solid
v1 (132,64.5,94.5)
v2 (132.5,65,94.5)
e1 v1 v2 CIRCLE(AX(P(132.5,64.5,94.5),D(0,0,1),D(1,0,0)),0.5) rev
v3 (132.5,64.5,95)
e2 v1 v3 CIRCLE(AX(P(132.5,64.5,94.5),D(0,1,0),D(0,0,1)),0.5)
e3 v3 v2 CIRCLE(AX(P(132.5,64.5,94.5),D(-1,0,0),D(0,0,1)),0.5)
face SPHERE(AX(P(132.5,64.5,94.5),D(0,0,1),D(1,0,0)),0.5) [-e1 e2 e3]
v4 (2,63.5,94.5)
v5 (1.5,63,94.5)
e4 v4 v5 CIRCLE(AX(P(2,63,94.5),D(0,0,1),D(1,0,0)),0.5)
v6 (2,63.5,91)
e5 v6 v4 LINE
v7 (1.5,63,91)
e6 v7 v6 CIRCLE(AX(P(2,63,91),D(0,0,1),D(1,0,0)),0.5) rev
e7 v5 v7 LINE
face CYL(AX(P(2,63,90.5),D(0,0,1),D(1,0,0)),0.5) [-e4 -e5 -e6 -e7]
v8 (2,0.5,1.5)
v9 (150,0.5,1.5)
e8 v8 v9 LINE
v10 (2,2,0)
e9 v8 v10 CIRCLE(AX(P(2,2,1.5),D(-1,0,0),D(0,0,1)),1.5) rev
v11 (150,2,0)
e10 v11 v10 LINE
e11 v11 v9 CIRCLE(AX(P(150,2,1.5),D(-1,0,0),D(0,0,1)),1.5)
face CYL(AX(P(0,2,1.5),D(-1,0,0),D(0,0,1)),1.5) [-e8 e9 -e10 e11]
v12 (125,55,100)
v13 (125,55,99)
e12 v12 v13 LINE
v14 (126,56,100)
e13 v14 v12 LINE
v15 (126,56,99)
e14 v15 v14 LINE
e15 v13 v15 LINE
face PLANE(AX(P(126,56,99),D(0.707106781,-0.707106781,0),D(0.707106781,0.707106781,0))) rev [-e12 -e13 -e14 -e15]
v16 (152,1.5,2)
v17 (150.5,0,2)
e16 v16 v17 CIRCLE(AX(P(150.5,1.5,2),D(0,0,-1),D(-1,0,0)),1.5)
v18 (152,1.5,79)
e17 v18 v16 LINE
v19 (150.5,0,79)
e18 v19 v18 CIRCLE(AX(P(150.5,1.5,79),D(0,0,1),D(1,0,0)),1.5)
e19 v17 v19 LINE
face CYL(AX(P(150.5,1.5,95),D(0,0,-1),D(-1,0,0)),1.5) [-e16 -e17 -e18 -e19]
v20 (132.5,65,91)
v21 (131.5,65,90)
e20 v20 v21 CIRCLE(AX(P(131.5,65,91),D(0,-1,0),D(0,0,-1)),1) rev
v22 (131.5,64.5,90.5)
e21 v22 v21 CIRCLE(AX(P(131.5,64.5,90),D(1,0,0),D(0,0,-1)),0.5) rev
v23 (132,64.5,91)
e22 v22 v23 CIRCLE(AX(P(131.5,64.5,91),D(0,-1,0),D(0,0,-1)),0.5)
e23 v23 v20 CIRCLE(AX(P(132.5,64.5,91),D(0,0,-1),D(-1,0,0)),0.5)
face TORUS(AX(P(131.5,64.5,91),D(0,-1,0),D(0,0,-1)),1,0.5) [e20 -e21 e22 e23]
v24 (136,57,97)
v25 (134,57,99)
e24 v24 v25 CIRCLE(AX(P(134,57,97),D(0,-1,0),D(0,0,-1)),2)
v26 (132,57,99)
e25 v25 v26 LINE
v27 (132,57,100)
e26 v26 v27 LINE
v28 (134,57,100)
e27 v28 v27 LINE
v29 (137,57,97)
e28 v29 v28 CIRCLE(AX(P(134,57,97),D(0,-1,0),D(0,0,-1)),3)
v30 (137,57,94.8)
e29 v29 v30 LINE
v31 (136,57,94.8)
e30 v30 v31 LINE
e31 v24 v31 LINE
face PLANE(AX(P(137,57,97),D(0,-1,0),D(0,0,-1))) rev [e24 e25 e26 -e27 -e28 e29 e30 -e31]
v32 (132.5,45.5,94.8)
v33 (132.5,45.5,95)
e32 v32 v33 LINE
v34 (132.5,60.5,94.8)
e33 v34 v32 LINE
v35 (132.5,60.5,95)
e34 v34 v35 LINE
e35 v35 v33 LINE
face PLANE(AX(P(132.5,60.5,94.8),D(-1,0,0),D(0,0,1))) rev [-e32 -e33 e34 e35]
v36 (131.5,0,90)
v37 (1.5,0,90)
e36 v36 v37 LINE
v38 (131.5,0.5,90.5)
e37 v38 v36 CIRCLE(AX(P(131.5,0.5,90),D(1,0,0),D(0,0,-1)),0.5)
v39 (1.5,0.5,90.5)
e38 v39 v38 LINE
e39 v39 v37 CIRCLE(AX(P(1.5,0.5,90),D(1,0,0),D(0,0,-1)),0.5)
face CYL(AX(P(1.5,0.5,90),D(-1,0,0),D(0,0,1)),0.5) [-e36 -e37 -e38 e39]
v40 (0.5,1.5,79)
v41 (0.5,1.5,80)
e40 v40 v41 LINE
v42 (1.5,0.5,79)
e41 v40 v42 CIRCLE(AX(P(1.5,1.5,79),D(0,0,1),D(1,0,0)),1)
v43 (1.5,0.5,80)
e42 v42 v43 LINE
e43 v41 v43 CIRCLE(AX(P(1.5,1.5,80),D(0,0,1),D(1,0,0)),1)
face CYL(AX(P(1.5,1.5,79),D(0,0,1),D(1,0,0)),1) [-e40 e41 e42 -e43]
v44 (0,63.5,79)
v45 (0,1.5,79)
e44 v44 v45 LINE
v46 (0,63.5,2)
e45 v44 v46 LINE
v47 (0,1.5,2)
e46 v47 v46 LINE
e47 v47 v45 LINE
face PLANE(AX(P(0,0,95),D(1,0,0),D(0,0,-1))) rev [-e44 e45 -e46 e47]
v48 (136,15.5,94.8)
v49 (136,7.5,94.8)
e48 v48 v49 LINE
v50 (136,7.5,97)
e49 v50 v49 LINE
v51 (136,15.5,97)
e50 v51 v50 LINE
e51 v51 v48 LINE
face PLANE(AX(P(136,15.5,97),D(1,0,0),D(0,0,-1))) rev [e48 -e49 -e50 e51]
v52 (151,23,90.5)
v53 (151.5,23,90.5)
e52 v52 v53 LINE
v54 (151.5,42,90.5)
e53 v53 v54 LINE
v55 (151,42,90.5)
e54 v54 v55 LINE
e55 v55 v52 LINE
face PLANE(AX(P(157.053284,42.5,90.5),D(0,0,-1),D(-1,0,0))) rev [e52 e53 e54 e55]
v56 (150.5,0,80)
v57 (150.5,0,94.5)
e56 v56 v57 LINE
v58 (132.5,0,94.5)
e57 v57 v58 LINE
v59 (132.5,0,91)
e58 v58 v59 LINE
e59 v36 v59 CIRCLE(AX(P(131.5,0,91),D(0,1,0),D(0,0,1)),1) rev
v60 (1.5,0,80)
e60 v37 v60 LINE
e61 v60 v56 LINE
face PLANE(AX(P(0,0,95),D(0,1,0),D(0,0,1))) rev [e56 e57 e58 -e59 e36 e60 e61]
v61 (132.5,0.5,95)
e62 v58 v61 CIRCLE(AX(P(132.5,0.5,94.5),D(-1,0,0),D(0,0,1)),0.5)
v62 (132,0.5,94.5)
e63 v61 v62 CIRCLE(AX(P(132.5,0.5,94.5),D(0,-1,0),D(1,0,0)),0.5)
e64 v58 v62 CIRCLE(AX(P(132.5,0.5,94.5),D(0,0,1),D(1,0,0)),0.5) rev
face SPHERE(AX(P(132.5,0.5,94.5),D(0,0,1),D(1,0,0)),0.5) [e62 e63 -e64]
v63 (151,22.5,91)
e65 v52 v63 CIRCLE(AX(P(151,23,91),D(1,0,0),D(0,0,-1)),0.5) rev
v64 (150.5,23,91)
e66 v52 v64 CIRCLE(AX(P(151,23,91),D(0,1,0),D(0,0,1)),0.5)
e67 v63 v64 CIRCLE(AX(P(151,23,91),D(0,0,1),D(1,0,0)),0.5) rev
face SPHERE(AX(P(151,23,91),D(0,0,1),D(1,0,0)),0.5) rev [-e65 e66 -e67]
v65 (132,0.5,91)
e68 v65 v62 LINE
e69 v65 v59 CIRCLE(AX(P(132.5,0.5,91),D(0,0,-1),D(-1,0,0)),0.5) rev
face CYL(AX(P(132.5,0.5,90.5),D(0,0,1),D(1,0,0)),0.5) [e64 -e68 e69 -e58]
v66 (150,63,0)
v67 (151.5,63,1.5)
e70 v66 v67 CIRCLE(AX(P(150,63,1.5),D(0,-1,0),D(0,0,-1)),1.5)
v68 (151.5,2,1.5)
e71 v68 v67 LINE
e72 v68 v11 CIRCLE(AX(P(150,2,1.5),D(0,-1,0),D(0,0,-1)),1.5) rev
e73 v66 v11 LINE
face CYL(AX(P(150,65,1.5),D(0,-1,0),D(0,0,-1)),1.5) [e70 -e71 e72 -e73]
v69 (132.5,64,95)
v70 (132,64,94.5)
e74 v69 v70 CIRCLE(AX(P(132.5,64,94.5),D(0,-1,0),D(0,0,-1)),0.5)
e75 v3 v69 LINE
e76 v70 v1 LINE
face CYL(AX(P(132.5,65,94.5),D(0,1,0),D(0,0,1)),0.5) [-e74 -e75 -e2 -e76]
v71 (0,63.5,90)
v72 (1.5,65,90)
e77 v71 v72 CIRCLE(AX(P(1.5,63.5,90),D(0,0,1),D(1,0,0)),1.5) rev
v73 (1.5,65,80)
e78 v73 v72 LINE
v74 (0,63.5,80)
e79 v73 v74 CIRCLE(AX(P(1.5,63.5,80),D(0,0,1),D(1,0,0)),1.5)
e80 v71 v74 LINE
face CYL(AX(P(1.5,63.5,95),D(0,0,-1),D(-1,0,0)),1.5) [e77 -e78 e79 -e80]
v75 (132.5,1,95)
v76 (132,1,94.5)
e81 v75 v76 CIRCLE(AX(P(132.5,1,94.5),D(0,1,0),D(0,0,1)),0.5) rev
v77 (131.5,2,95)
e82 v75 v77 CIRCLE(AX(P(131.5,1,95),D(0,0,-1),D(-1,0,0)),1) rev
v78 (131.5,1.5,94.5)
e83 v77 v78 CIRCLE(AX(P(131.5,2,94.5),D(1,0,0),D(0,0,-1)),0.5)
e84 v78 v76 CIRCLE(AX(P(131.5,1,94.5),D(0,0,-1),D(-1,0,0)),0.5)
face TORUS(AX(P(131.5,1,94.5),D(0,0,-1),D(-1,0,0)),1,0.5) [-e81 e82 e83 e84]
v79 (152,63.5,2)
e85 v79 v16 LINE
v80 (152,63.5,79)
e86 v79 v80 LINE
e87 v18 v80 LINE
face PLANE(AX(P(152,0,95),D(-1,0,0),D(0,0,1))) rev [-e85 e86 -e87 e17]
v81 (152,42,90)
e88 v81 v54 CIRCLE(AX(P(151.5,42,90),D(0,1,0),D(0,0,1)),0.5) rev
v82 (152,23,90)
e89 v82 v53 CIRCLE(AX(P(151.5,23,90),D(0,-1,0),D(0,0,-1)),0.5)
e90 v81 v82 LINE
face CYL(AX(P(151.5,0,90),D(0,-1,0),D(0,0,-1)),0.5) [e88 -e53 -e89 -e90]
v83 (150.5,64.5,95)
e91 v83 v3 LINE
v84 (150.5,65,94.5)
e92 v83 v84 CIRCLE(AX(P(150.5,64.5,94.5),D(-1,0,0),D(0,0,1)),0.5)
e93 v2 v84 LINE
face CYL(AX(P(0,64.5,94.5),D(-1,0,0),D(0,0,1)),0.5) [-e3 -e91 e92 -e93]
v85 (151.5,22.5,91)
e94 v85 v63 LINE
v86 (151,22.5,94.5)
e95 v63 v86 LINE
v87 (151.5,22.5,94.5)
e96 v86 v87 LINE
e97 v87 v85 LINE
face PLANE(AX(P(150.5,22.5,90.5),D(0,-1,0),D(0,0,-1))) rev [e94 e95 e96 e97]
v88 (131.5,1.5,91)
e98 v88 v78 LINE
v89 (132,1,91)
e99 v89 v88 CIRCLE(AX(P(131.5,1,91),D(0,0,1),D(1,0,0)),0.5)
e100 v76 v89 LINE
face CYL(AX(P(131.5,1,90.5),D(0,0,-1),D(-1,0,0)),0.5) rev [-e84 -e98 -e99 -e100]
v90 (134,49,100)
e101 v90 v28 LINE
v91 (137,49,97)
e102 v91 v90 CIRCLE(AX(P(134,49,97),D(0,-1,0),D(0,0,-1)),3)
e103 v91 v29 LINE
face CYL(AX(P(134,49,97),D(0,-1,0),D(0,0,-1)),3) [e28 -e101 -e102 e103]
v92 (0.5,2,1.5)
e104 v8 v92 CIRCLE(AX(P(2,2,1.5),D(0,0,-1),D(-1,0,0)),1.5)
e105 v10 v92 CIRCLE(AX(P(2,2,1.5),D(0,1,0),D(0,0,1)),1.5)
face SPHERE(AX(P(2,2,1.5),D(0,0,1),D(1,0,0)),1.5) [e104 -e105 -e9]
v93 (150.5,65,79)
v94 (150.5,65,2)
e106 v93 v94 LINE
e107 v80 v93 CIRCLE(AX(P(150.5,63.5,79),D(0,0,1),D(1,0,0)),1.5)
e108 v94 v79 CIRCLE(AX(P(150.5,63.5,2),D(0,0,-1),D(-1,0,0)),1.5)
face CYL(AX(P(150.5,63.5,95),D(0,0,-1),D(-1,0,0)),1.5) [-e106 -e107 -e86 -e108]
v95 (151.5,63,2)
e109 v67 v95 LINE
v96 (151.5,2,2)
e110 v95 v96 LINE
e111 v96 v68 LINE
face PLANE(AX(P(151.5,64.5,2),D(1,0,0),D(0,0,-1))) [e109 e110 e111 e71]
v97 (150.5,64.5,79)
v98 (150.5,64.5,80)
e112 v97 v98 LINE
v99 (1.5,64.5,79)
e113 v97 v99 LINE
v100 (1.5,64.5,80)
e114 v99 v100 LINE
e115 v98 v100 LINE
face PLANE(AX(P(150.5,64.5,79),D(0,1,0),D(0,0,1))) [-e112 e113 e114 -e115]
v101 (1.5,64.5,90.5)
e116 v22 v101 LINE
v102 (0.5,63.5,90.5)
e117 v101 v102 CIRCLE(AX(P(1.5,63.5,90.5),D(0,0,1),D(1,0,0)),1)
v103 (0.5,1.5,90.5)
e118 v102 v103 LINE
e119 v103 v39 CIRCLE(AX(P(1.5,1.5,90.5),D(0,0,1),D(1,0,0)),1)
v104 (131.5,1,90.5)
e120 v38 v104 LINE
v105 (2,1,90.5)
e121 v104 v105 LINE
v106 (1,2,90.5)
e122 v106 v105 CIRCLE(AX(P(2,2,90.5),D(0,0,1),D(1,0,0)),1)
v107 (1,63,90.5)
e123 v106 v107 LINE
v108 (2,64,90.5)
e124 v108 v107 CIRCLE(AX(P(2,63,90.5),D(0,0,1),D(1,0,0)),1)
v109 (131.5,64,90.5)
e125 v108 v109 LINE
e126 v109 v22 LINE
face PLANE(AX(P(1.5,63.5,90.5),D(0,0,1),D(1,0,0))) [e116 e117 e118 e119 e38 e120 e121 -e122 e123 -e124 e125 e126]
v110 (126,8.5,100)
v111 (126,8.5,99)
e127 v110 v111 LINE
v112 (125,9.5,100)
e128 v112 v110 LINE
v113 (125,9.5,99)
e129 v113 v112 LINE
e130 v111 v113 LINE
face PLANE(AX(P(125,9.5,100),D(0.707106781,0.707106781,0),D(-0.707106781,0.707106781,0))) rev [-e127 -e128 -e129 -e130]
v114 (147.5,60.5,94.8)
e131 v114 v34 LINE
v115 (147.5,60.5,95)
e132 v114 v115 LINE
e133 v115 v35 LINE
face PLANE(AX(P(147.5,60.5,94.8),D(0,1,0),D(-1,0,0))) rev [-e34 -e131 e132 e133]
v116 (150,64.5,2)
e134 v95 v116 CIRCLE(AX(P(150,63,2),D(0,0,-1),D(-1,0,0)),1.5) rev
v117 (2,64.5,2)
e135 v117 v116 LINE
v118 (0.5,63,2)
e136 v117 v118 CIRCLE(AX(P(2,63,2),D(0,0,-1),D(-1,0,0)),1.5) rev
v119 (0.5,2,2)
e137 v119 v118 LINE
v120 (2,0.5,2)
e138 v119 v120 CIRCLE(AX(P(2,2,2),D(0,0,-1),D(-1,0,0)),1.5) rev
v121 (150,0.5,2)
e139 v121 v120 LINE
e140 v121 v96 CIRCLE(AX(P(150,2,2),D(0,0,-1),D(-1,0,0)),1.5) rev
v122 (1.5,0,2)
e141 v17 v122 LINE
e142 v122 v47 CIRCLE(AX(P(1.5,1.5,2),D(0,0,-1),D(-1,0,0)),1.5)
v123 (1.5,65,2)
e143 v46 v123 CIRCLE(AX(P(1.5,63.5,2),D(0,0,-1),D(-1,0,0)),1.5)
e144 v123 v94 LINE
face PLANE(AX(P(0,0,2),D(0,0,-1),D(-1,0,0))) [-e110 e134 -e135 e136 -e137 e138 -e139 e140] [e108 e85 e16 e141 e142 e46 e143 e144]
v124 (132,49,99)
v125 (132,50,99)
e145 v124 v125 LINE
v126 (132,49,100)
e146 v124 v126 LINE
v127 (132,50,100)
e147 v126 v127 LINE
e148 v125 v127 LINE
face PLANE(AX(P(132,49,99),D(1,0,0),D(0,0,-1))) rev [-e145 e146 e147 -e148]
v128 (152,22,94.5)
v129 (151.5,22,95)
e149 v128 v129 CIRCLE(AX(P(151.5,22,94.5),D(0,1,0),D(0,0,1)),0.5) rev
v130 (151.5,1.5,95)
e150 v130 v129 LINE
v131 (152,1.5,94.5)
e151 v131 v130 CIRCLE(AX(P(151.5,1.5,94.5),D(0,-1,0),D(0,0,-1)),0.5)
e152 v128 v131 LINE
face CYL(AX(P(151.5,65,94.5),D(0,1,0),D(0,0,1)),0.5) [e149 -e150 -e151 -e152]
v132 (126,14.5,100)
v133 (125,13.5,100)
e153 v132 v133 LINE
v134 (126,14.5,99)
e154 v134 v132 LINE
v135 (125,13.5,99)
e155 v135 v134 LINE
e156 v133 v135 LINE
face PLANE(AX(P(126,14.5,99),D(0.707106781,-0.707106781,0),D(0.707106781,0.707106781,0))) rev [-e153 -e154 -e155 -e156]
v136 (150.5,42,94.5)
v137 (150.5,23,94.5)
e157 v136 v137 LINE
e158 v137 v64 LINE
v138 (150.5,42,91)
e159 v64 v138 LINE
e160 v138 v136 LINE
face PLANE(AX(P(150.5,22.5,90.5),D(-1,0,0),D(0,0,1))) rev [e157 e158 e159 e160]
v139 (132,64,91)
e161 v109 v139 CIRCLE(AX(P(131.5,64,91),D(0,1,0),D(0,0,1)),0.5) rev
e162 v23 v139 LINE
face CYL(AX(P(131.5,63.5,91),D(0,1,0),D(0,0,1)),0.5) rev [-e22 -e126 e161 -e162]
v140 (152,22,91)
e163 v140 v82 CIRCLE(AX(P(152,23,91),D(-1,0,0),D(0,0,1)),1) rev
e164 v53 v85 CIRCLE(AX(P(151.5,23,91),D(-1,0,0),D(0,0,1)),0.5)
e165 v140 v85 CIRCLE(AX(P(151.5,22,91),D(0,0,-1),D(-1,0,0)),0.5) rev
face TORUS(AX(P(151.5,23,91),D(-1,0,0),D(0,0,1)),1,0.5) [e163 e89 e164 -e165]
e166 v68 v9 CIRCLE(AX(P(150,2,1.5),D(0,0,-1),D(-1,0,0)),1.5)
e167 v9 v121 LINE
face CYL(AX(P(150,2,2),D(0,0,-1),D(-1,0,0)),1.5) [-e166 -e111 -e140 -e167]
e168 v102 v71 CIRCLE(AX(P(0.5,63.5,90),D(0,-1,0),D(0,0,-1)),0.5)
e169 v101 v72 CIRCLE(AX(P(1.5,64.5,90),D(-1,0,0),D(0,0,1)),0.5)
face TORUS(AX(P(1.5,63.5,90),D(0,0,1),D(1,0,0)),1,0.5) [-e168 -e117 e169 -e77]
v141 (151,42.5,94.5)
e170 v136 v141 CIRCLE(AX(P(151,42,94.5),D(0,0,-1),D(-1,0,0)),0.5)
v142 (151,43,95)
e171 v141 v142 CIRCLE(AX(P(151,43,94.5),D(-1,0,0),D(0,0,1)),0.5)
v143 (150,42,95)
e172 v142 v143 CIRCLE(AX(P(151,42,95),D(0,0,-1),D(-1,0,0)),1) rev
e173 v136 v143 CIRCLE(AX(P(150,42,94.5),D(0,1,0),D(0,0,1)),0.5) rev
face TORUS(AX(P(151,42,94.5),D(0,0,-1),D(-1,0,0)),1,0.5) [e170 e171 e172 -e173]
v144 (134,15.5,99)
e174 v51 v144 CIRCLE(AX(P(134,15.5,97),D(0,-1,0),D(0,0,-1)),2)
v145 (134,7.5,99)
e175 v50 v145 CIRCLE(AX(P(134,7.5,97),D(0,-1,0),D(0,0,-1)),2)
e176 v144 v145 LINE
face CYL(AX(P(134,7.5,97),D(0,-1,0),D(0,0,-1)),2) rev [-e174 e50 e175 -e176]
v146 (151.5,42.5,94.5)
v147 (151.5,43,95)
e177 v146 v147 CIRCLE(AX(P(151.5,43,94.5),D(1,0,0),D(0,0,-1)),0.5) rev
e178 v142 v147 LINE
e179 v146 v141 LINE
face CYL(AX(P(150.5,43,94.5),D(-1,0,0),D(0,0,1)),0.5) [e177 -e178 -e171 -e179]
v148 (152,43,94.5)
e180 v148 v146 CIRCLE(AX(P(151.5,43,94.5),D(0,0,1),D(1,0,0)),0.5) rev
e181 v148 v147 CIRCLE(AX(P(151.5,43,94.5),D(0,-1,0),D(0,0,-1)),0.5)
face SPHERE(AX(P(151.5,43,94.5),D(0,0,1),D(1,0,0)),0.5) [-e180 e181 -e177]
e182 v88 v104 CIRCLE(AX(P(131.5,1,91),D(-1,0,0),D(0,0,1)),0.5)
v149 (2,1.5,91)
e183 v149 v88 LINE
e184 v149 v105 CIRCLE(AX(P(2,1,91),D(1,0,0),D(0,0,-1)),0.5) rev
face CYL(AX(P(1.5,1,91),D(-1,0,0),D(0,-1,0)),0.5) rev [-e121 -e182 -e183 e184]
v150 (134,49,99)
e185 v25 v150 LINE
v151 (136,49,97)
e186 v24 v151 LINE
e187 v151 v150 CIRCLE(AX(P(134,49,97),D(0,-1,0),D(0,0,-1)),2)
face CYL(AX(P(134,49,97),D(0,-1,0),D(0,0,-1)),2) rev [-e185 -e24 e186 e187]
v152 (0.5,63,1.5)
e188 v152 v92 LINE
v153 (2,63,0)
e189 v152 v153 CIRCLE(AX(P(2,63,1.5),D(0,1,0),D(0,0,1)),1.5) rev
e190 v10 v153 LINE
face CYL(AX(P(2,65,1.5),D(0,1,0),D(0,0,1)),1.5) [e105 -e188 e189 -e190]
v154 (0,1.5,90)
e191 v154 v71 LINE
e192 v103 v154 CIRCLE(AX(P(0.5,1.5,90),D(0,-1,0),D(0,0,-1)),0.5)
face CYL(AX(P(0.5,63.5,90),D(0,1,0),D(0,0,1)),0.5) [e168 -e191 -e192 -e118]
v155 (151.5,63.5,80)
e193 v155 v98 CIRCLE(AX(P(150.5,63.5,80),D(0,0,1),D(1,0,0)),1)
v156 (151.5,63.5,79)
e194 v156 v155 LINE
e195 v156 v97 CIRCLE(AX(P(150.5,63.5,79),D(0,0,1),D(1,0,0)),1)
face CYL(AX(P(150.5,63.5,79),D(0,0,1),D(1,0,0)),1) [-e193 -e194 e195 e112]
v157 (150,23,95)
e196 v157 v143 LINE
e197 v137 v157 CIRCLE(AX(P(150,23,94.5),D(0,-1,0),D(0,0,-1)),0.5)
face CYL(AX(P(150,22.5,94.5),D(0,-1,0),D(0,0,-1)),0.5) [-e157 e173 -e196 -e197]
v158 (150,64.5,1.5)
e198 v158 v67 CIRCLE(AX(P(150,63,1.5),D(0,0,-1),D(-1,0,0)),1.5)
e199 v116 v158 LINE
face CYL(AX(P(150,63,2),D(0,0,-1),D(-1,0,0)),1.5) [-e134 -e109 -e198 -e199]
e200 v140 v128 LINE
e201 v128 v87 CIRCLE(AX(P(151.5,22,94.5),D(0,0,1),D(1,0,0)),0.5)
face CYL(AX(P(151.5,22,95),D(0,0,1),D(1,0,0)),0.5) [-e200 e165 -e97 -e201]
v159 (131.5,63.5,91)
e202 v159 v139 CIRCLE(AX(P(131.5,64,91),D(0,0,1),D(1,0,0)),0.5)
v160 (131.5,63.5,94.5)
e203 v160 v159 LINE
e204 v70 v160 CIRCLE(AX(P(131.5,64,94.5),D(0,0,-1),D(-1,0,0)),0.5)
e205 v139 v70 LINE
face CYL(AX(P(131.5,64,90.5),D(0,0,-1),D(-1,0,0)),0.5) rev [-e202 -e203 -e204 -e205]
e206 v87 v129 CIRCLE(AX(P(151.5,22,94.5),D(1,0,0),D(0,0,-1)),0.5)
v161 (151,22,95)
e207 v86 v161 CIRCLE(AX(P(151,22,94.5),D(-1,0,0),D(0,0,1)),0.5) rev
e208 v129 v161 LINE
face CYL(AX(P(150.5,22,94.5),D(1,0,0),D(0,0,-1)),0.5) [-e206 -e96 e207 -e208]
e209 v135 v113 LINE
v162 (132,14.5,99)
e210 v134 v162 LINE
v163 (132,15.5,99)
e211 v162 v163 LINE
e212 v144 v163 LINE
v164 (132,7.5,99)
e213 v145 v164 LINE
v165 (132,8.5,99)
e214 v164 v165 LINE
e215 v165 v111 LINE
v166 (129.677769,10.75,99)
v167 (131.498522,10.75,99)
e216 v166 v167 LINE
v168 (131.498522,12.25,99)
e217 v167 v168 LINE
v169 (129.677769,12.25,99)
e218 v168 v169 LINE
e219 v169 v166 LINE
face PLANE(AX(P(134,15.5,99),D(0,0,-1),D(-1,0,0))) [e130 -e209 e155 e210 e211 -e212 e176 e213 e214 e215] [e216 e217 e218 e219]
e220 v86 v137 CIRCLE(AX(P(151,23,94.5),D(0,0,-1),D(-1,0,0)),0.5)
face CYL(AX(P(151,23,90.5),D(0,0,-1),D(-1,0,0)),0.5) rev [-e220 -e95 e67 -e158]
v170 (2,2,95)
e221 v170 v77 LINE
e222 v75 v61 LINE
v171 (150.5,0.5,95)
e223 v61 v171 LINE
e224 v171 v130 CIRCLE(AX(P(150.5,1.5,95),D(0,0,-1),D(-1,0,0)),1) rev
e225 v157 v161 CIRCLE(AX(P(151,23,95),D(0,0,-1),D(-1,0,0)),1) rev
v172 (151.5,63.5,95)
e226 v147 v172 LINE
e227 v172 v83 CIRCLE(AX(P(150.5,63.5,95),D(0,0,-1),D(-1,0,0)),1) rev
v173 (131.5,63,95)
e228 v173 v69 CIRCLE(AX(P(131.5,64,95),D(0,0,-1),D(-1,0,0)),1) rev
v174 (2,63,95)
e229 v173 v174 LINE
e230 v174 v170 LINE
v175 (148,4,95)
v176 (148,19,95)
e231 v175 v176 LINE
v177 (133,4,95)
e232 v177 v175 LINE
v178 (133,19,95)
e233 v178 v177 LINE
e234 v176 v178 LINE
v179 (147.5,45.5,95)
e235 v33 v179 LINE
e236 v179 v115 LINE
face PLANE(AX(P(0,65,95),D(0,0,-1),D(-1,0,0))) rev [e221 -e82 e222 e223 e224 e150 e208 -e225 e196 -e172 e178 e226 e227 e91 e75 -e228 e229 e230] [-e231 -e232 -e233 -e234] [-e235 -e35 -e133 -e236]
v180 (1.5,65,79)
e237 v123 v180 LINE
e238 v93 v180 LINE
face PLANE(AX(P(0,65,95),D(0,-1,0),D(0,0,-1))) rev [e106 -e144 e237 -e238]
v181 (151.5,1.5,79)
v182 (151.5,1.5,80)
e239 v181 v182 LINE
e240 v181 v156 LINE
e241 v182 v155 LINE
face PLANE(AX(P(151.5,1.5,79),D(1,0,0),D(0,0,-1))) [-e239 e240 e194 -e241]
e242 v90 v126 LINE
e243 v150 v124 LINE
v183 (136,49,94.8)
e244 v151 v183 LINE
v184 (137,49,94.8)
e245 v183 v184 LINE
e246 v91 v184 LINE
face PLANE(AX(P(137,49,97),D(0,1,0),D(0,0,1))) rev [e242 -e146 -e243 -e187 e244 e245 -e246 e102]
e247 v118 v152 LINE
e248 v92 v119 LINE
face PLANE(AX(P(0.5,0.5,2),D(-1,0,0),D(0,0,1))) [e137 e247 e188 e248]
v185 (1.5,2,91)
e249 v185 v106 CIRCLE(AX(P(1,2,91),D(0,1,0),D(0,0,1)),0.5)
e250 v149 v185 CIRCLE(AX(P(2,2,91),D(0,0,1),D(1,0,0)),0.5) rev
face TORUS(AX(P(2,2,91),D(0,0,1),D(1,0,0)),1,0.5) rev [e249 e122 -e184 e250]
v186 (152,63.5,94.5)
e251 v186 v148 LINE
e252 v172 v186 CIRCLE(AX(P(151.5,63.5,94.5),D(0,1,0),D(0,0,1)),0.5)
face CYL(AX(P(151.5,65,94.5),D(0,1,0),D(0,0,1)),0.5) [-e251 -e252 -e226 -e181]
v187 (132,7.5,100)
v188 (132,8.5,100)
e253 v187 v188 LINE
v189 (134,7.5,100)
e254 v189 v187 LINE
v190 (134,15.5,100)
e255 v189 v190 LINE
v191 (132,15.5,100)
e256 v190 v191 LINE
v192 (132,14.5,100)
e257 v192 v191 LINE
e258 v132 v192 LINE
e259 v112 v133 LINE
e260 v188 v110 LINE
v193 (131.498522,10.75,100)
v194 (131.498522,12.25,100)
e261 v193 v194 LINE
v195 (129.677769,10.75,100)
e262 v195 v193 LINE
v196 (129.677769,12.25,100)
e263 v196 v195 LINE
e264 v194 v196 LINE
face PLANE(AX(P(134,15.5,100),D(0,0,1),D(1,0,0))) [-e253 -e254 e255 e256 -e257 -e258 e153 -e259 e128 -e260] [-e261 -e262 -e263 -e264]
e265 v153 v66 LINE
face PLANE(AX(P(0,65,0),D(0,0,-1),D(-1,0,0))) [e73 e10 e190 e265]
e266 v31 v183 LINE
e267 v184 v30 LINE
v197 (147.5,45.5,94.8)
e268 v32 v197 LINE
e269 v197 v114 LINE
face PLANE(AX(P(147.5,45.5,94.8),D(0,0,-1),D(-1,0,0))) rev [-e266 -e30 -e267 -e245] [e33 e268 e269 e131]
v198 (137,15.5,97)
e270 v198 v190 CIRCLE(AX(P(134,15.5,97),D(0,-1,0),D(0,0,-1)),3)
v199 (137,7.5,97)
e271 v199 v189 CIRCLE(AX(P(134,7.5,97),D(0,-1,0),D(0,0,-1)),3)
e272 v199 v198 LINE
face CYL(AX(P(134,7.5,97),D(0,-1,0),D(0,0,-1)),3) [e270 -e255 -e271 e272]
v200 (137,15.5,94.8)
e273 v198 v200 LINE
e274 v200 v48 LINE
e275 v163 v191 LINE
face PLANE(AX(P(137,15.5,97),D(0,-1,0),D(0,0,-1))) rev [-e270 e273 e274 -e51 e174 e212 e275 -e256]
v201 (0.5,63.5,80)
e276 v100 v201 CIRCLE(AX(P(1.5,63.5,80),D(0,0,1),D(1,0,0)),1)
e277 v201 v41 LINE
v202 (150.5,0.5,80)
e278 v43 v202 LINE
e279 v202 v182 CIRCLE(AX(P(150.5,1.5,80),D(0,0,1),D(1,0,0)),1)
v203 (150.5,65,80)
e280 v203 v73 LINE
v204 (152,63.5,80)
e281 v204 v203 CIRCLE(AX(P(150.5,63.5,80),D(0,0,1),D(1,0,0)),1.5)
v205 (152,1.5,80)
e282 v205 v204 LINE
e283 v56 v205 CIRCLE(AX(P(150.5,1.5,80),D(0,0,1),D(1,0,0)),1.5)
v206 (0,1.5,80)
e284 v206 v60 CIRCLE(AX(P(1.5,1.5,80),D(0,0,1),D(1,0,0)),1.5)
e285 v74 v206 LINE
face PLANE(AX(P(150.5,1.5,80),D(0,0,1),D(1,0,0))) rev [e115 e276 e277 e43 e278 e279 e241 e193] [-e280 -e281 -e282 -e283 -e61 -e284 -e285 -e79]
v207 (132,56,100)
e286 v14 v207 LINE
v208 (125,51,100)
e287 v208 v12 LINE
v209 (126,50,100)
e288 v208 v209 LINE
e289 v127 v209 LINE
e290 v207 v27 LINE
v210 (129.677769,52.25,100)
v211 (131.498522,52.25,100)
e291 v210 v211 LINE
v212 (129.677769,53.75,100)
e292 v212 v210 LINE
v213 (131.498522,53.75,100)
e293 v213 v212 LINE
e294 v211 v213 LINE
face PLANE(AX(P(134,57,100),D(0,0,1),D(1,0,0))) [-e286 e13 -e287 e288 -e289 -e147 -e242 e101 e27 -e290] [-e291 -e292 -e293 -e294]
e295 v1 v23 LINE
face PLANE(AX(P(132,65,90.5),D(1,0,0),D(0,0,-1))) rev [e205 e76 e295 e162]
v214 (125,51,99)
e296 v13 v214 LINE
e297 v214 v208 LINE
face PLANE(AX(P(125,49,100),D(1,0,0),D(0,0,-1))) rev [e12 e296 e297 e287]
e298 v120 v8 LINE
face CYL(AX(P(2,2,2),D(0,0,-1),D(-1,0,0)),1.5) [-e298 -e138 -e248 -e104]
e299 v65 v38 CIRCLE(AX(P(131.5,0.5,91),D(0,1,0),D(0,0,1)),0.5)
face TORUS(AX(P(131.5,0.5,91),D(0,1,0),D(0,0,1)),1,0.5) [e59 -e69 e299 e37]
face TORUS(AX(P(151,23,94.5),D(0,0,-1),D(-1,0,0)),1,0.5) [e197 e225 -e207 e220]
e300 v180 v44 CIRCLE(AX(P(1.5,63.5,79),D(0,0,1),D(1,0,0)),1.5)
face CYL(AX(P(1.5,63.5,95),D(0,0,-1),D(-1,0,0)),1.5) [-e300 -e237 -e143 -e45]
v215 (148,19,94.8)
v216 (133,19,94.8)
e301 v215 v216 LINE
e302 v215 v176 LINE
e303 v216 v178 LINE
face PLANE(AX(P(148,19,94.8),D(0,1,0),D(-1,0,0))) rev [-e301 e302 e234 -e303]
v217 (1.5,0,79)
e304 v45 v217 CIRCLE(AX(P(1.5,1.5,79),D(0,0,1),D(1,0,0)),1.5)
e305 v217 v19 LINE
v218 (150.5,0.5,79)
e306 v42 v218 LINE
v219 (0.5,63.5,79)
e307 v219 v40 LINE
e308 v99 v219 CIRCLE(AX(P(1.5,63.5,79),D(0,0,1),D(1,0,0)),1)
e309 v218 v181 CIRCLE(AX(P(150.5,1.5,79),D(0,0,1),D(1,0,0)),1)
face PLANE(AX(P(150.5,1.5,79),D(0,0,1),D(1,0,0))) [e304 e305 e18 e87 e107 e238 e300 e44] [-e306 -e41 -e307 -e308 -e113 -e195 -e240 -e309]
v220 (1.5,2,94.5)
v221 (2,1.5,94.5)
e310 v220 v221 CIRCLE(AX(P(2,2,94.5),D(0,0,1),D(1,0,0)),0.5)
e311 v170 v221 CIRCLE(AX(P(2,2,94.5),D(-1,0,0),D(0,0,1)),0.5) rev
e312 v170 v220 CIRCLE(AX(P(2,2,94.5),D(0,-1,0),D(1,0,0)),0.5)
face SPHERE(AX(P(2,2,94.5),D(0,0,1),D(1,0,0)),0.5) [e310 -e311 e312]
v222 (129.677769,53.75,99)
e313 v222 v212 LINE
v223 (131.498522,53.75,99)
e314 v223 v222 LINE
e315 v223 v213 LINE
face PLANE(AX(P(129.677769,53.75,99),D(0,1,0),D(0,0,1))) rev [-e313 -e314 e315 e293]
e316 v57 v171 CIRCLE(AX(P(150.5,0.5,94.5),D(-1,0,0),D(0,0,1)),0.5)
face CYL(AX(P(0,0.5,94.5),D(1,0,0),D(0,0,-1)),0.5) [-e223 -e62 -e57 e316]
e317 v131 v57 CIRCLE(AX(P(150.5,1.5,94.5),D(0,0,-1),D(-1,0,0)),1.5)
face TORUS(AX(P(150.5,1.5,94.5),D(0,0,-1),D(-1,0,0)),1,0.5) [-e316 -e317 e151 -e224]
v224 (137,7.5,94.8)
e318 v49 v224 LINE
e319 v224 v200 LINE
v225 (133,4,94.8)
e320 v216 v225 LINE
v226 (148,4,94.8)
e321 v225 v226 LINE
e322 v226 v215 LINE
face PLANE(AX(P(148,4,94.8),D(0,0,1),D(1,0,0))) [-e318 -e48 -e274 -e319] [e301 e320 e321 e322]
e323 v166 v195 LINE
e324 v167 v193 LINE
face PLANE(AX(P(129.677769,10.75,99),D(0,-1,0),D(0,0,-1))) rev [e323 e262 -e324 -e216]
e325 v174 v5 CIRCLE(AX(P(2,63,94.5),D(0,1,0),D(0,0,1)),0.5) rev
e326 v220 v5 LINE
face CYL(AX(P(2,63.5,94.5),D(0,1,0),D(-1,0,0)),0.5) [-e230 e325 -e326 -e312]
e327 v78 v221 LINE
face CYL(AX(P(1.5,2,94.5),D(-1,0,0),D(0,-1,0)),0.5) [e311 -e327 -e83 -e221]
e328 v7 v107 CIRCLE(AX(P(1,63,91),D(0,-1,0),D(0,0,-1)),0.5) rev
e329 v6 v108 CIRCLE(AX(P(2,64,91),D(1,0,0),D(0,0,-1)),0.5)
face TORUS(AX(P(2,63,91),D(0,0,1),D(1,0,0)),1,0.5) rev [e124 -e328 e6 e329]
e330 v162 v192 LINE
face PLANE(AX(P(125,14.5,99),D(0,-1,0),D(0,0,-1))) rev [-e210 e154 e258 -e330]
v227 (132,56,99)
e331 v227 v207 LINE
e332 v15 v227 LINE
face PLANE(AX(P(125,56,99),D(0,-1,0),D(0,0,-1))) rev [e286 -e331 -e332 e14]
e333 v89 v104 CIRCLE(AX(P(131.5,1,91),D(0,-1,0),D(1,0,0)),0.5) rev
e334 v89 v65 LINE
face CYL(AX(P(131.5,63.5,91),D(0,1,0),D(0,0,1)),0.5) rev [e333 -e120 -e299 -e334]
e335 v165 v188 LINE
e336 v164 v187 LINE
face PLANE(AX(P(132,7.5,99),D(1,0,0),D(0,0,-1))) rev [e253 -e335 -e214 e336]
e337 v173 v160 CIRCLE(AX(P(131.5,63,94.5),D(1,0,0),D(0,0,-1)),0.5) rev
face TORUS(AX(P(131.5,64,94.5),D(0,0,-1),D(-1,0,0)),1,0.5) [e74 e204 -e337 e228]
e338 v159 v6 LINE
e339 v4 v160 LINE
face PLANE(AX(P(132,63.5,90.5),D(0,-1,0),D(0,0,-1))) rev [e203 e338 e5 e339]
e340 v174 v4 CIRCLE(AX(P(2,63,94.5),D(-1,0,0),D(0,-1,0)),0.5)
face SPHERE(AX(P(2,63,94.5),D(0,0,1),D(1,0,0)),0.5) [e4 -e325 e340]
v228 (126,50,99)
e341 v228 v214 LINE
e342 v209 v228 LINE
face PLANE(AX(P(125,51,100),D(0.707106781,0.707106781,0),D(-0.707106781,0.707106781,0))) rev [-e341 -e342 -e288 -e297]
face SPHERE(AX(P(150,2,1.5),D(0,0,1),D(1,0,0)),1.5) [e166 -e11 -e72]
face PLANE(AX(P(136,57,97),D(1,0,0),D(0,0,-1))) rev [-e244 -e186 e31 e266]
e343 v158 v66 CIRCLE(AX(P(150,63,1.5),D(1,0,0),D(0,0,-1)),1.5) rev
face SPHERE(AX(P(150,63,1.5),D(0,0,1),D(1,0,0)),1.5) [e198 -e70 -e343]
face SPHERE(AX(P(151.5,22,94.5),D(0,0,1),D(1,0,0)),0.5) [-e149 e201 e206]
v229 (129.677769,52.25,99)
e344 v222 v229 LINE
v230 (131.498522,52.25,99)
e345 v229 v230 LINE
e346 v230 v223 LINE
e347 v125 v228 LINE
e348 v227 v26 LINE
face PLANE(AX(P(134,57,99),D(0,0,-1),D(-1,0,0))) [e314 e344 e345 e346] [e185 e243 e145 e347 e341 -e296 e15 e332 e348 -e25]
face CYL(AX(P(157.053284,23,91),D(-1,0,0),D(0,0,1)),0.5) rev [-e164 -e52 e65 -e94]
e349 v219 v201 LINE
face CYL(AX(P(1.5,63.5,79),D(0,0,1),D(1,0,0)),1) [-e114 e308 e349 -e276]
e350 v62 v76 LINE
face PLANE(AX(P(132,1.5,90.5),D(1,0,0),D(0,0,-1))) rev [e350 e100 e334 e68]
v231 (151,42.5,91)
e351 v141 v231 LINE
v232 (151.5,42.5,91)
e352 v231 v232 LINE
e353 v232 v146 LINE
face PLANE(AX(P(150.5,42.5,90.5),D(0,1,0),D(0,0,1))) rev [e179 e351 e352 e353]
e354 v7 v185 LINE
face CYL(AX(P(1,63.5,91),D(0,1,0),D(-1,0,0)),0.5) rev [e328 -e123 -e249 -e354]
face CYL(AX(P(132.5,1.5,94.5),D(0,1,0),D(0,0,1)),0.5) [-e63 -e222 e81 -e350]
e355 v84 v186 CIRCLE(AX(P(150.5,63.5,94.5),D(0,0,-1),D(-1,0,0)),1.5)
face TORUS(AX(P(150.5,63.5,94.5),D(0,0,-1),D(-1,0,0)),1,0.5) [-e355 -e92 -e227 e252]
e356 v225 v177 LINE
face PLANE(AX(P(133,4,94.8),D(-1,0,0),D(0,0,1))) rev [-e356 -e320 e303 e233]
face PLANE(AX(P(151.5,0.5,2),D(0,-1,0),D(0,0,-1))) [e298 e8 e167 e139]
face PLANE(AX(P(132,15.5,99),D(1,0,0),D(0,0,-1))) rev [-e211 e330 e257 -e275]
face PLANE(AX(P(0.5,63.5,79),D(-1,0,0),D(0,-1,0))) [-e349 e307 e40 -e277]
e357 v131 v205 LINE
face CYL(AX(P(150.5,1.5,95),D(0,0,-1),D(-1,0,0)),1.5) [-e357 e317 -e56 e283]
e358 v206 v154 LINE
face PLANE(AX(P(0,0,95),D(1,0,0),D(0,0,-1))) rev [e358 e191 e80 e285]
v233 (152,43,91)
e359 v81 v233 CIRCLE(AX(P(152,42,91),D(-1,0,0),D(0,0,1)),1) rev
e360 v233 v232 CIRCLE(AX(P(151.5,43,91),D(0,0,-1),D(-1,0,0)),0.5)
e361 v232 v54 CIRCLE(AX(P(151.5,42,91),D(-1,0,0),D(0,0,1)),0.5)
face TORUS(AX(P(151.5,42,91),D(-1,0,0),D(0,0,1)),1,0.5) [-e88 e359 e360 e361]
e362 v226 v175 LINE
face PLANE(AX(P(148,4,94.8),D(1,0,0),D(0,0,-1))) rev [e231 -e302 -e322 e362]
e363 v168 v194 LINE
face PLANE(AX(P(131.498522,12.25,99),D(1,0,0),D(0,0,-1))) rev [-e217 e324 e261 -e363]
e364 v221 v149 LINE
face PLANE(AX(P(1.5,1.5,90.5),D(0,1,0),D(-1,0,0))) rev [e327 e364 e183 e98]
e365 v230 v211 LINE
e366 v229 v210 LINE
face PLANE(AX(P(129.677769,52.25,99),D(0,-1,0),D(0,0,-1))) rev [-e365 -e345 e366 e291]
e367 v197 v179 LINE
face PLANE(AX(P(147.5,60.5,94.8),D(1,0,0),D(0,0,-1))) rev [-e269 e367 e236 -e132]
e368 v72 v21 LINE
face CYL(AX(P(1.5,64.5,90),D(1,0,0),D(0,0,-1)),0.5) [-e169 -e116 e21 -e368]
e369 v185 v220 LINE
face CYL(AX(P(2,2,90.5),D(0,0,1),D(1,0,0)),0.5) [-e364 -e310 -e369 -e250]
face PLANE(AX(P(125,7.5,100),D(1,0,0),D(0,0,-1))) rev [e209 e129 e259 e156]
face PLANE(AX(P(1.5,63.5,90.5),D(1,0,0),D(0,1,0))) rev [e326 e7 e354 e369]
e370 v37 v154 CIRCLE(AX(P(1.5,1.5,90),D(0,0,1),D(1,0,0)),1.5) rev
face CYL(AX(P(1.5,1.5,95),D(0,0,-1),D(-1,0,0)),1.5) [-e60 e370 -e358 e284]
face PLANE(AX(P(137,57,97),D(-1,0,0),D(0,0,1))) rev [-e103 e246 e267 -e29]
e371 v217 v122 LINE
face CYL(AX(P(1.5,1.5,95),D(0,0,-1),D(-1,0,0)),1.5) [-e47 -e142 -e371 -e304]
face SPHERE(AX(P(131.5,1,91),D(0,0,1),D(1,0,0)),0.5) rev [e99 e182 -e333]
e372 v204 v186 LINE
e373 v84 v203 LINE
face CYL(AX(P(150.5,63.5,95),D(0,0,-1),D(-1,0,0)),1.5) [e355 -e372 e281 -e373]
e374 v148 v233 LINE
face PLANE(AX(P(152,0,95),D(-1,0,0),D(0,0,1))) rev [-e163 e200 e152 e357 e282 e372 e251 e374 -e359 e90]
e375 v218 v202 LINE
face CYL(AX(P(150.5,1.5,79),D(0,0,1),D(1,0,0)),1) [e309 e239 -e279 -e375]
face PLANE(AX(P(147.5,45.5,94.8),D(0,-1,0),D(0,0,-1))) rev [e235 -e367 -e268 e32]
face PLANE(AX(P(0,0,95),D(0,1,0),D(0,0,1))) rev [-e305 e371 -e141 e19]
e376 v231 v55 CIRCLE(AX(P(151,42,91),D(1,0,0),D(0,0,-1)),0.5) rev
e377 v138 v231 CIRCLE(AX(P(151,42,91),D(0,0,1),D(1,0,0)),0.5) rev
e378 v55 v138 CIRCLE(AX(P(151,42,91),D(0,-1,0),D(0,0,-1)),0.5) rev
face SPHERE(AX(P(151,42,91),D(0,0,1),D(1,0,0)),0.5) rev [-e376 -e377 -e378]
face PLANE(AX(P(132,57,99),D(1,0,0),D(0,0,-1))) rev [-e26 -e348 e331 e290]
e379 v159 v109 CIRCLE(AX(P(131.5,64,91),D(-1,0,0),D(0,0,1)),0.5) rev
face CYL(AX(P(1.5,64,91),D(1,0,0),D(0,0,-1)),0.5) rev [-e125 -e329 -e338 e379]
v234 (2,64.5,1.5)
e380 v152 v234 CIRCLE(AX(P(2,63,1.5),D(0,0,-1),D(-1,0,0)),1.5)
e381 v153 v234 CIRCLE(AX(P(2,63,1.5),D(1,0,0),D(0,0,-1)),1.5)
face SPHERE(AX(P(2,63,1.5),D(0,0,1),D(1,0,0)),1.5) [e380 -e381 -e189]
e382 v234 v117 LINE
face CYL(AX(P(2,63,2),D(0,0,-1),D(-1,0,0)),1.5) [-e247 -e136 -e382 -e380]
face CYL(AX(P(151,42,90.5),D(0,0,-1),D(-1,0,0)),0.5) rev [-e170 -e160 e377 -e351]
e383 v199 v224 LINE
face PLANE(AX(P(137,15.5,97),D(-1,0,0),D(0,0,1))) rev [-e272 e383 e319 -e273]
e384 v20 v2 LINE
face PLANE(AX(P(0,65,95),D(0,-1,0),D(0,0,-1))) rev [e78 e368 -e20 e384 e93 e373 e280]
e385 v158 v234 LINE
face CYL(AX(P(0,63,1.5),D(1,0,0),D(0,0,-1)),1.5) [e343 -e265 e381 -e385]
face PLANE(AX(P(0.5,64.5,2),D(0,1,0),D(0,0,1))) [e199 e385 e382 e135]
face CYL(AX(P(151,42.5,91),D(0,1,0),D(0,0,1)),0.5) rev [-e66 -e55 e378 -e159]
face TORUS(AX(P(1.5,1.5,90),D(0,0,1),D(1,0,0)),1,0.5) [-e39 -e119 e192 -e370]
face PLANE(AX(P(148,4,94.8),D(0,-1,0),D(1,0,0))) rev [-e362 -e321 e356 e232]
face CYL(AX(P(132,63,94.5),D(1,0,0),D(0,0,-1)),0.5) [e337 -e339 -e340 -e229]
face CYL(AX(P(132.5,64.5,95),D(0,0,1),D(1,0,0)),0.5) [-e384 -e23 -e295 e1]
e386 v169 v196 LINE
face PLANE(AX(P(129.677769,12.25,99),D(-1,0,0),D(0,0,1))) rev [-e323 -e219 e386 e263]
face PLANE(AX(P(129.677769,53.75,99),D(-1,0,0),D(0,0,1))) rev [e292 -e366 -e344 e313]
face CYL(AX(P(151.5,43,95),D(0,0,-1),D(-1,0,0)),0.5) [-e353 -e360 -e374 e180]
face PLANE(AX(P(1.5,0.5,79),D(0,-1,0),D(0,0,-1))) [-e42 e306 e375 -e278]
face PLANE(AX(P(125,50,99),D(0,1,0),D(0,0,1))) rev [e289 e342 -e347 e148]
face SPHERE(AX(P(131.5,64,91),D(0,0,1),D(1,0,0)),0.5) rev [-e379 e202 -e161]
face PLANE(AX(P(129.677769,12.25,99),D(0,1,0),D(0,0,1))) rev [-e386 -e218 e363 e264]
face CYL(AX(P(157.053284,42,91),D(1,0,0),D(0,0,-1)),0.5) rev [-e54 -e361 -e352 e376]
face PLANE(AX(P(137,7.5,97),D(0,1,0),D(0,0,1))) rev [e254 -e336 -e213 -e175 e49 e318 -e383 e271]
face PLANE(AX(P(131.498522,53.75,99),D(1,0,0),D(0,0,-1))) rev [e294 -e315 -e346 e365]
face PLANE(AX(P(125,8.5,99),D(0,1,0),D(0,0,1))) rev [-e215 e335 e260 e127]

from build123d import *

# Parameters (mm, degrees)
ESQUISSE1_W                             = 152
ESQUISSE1_H                             = 65
EXTRUSION1_DEPTH                        = 95
ESQUISSE2_W                             = 152
ESQUISSE2_H                             = 65
ESQUISSE2_W_2                           = 151
ESQUISSE2_H_2                           = 64
ENL_V_MAT_EXTRU_1_DEPTH                 = 2
CONG_1_R                                = 1.5
CONG_2_R                                = 1.5
ENL_V_START                             = -1
ENL_V_MAT_EXTRU_2_DEPTH                 = 1
ENL_V_START_2                           = -4.5
ESQUISSE4_W                             = 6.55328375
ESQUISSE4_H                             = 20
ENL_V_MAT_EXTRU_3_DEPTH                 = 4.5
CONG_3_R                                = 0.5
ESQUISSE5_W                             = 15
ESQUISSE5_H                             = 15
ENL_V_MAT_EXTRU_4_DEPTH                 = 0.2
ESQUISSE6_W                             = 15
ESQUISSE6_H                             = 15
ENL_V_MAT_EXTRU_5_DEPTH                 = 0.2
ESQUISSE7_W                             = 1
ESQUISSE7_H                             = 8
ESQUISSE9_W                             = 7
ESQUISSE9_H                             = 1
ESQUISSE9_W_2                           = 1.820752184
ESQUISSE9_H_2                           = 1.5
ENL_V_MAT_EXTRU_6_DEPTH                 = 1
CHANFREIN1_SIZE                         = 1
R_P_TITION_LIN_AIRE1_COUNT              = 2
R_P_TITION_LIN_AIRE1_PITCH              = 41.5
CHANFREIN1_OF_R_P_TITION_LIN_AIRE1_SIZE = 1


with BuildPart() as part:
    # Esquisse1 → Extrusion1 (new body)
    with BuildSketch(Plane.XY):
        with Locations((76, 32.5)):
            Rectangle(ESQUISSE1_W, ESQUISSE1_H)
    extrude(amount=EXTRUSION1_DEPTH)

    # Esquisse2 → Enlèv. mat.-Extru.1 (cut)
    with BuildSketch(Plane(origin=(0, 0, 0), x_dir=(-1, 0, 0), z_dir=(0, 0, -1))):
        with Locations((-76, 32.5)):
            Rectangle(ESQUISSE2_W, ESQUISSE2_H)
        with Locations((-76, 32.5)):
            Rectangle(ESQUISSE2_W_2, ESQUISSE2_H_2, mode=Mode.SUBTRACT)
    extrude(amount=-ENL_V_MAT_EXTRU_1_DEPTH, mode=Mode.SUBTRACT)

    # Congé1
    cong_1_edges = [part.edges().sort_by_distance(p)[0] for p in [
        (76, 0.5, 0),
        (151.5, 32.5, 0),
        (76, 64.5, 0),
        (0.5, 32.5, 0),
    ]]
    fillet(cong_1_edges, radius=CONG_1_R)

    # Congé2
    # the kernel refuses this fillet: 1.5 mm, written as the material it takes off along each edge
    with BuildSketch(Plane(origin=(2, 2, 1.5), x_dir=(-1, 0, 0), z_dir=(0, -1, 0))) as cong_2_piece_1_section:
        Polygon((0, 0), (CONG_2_R, 0), (CONG_2_R, CONG_2_R), (0, CONG_2_R), align=None)
    cong_2_piece_1 = extrude(amount=CONG_2_R, mode=Mode.PRIVATE)
    cong_2_piece_1 = cong_2_piece_1 - Plane(origin=(2, 2, 1.5), x_dir=(0.7071067811865475, 0, 0.7071067811865475), z_dir=(0, -1, 0)) * Sphere(CONG_2_R, mode=Mode.PRIVATE)
    add(cong_2_piece_1, mode=Mode.SUBTRACT)
    with BuildSketch(Plane(origin=(150, 2, 1.5), x_dir=(1, 0, 0), z_dir=(0, -1, 0))) as cong_2_piece_2_section:
        Polygon((0, 0), (CONG_2_R, 0), (CONG_2_R, -CONG_2_R), (0, -CONG_2_R), align=None)
    cong_2_piece_2 = extrude(amount=CONG_2_R, mode=Mode.PRIVATE)
    cong_2_piece_2 = cong_2_piece_2 - Plane(origin=(150, 2, 1.5), x_dir=(-0.7071067811865475, 0, 0.7071067811865475), z_dir=(0, -1, 0)) * Sphere(CONG_2_R, mode=Mode.PRIVATE)
    add(cong_2_piece_2, mode=Mode.SUBTRACT)
    with BuildSketch(Plane(origin=(2, 63, 1.5), x_dir=(0, 1, 0), z_dir=(-1, 0, 0))) as cong_2_piece_3_section:
        Polygon((0, 0), (CONG_2_R, 0), (CONG_2_R, CONG_2_R), (0, CONG_2_R), align=None)
    cong_2_piece_3 = extrude(amount=CONG_2_R, mode=Mode.PRIVATE)
    cong_2_piece_3 = cong_2_piece_3 - Plane(origin=(2, 63, 1.5), x_dir=(0, -0.7071067811865475, 0.7071067811865475), z_dir=(-1, 0, 0)) * Sphere(CONG_2_R, mode=Mode.PRIVATE)
    add(cong_2_piece_3, mode=Mode.SUBTRACT)
    with BuildSketch(Plane(origin=(150, 63, 1.5), x_dir=(0, 1, 0), z_dir=(1, 0, 0))) as cong_2_piece_4_section:
        Polygon((0, 0), (CONG_2_R, 0), (CONG_2_R, -CONG_2_R), (0, -CONG_2_R), align=None)
    cong_2_piece_4 = extrude(amount=CONG_2_R, mode=Mode.PRIVATE)
    cong_2_piece_4 = cong_2_piece_4 - Plane(origin=(150, 63, 1.5), x_dir=(0, -0.7071067811865475, 0.7071067811865475), z_dir=(1, 0, 0)) * Sphere(CONG_2_R, mode=Mode.PRIVATE)
    add(cong_2_piece_4, mode=Mode.SUBTRACT)
    with BuildSketch(Plane(origin=(151.5, 0.5, 1.5), x_dir=(-1, 0, 0), z_dir=(0, 0, 1)), Plane(origin=(151.5, 64.5, 1.5), x_dir=(0, -1, 0), z_dir=(0, 0, 1))) as cong_2_piece_5:
        with BuildLine():
            CenterArc((CONG_2_R, -CONG_2_R), CONG_2_R, 90, 90)
            Line((0, -CONG_2_R), (0, 0))
            Line((0, 0), (CONG_2_R, 0))
        make_face()
    extrude(amount=0.5, mode=Mode.SUBTRACT)
    with BuildSketch(Plane(origin=(0.5, 64.5, 1.5), x_dir=(0, -1, 0), z_dir=(0, 0, 1)), Plane(origin=(0.5, 0.5, 1.5), x_dir=(1, 0, 0), z_dir=(0, 0, 1))) as cong_2_piece_6:
        with BuildLine():
            CenterArc((CONG_2_R, CONG_2_R), CONG_2_R, 180, 90)
            Line((0, CONG_2_R), (0, 0))
            Line((0, 0), (CONG_2_R, 0))
        make_face()
    extrude(amount=0.5, mode=Mode.SUBTRACT)
    with BuildSketch(Plane(origin=(0, 65, -1.75), x_dir=(0, -1, 0), z_dir=(0, 0, 1)), Plane(origin=(152, 65, -1.75), x_dir=(-1, 0, 0), z_dir=(0, 0, 1)), Plane(origin=(152, 0, -1.75), x_dir=(0, 1, 0), z_dir=(0, 0, 1))) as cong_2_piece_7:
        with BuildLine():
            CenterArc((CONG_2_R, CONG_2_R), CONG_2_R, 180, 90)
            Line((0, CONG_2_R), (0, 0))
            Line((0, 0), (CONG_2_R, 0))
        make_face()
    extrude(amount=100.5, mode=Mode.SUBTRACT)
    with BuildSketch(Plane(origin=(0, 0, -1.75), x_dir=(0, 1, 0), z_dir=(0, 0, 1))) as cong_2_piece_8:
        with BuildLine():
            CenterArc((CONG_2_R, -CONG_2_R), CONG_2_R, 90, 90)
            Line((0, -CONG_2_R), (0, 0))
            Line((0, 0), (CONG_2_R, 0))
        make_face()
    extrude(amount=100.5, mode=Mode.SUBTRACT)

    # Esquisse3 → Enlèv. mat.-Extru.2 (cut)
    with BuildSketch(Plane.XY.offset(80).offset(ENL_V_START)):
        with BuildLine():
            Line((152, 1.5), (152, 63.5))
            ThreePointArc((152, 63.5), (151.560660172, 64.560660172), (150.5, 65))
            Line((150.5, 65), (1.5, 65))
            ThreePointArc((1.5, 65), (0.439339828, 64.560660172), (0, 63.5))
            Line((0, 63.5), (0, 1.5))
            ThreePointArc((0, 1.5), (0.439339828, 0.439339828), (1.5, 0))
            Line((1.5, 0), (150.5, 0))
            ThreePointArc((150.5, 0), (151.560660172, 0.439339828), (152, 1.5))
        make_face()
        with BuildLine():
            Line((151.5, 1.5), (151.5, 63.5))
            ThreePointArc((151.5, 63.5), (151.207106781, 64.207106781), (150.5, 64.5))
            Line((150.5, 64.5), (1.5, 64.5))
            ThreePointArc((1.5, 64.5), (0.792893219, 64.207106781), (0.5, 63.5))
            Line((0.5, 63.5), (0.5, 1.5))
            ThreePointArc((0.5, 1.5), (0.792893219, 0.792893219), (1.5, 0.5))
            Line((1.5, 0.5), (150.5, 0.5))
            ThreePointArc((150.5, 0.5), (151.207106781, 0.792893219), (151.5, 1.5))
        make_face(mode=Mode.SUBTRACT)
    extrude(amount=ENL_V_MAT_EXTRU_2_DEPTH, mode=Mode.SUBTRACT)

    # Esquisse4 → Enlèv. mat.-Extru.3 (cut)
    with BuildSketch(Plane.XY.offset(95).offset(ENL_V_START_2)):
        with Locations((153.776641875, 32.5)):
            Rectangle(ESQUISSE4_W, ESQUISSE4_H)
        with BuildLine():
            Line((132, 63.5), (1.5, 63.5))
            Line((1.5, 63.5), (1.5, 1.5))
            Line((1.5, 1.5), (132, 1.5))
            Line((132, 1.5), (132, 0))
            Line((132, 0), (1.5, 0))
            ThreePointArc((1.5, 0), (0.439339828, 0.439339828), (0, 1.5))
            Line((0, 1.5), (0, 63.5))
            ThreePointArc((0, 63.5), (0.439339828, 64.560660172), (1.5, 65))
            Line((1.5, 65), (132, 65))
            Line((132, 65), (132, 63.5))
        make_face()
    extrude(amount=ENL_V_MAT_EXTRU_3_DEPTH, mode=Mode.SUBTRACT)

    # Congé3
    cong_3_edges = [part.edges().sort_by_distance(p)[0] for p in [
        (141.25, 0, 95),
        (0.439339828, 64.560660172, 90.5),
        (66.75, 65, 90.5),
        (132, 64.25, 90.5),
        (132, 65, 92.75),
        (66.75, 63.5, 90.5),
        (132, 63.5, 92.75),
        (1.5, 32.5, 90.5),
        (1.5, 63.5, 92.75),
        (66.75, 1.5, 90.5),
        (1.5, 1.5, 92.75),
        (132, 0.75, 90.5),
        (132, 1.5, 92.75),
        (66.75, 0, 90.5),
        (132, 0, 92.75),
        (0.439339828, 0.439339828, 90.5),
        (0, 32.5, 90.5),
        (132, 0.75, 95),
        (66.75, 1.5, 95),
        (1.5, 32.5, 95),
        (66.75, 63.5, 95),
        (132, 64.25, 95),
        (152, 53, 95),
        (152, 32.5, 90.5),
        (152, 22.5, 92.75),
        (152, 42.5, 92.75),
        (151.25, 42.5, 90.5),
        (150.5, 42.5, 92.75),
        (151.25, 22.5, 90.5),
        (151.25, 42.5, 95),
        (150.5, 32.5, 95),
        (151.25, 22.5, 95),
        (150.5, 32.5, 90.5),
        (150.5, 22.5, 92.75),
        (141.25, 65, 95),
        (152, 12, 95),
        (151.560660172, 0.439339828, 95),
        (151.560660172, 64.560660172, 95),
    ]]
    fillet(cong_3_edges, radius=CONG_3_R)

    # Esquisse5 → Enlèv. mat.-Extru.4 (cut)
    with BuildSketch(Plane.XY.offset(95)):
        with Locations((140.5, 11.5)):
            Rectangle(ESQUISSE5_W, ESQUISSE5_H)
    extrude(amount=-ENL_V_MAT_EXTRU_4_DEPTH, mode=Mode.SUBTRACT)

    # Esquisse6 → Enlèv. mat.-Extru.5 (cut)
    with BuildSketch(Plane.XY.offset(95)):
        with Locations((140, 53)):
            Rectangle(ESQUISSE6_W, ESQUISSE6_H)
    extrude(amount=-ENL_V_MAT_EXTRU_5_DEPTH, mode=Mode.SUBTRACT)

    # Balayage1: sweep along a path in Esquisse8
    with BuildLine(Plane.XZ.offset(-7.5)) as balayage1_path:
        Line((136, 94.8), (136, 97))
        ThreePointArc((136, 97), (135.414213562, 98.414213562), (134, 99))
        Line((134, 99), (125, 99))
    # Esquisse7 → Balayage1 (sweep)
    with BuildSketch(Plane.XY.offset(94.8)):
        with Locations((136.5, 11.5)):
            Rectangle(ESQUISSE7_W, ESQUISSE7_H)
    balayage1 = sweep(path=balayage1_path.line)

    # Esquisse9 → Enlèv. mat.-Extru.6 (cut)
    with BuildSketch(Plane.XY.offset(100)):
        with Locations((128.5, 8)):
            Rectangle(ESQUISSE9_W, ESQUISSE9_H)
        with Locations((128.5, 15)):
            Rectangle(ESQUISSE9_W, ESQUISSE9_H)
        with Locations((130.588145488, 11.5)):
            Rectangle(ESQUISSE9_W_2, ESQUISSE9_H_2)
    enl_v_mat_extru_6 = extrude(amount=-ENL_V_MAT_EXTRU_6_DEPTH, mode=Mode.SUBTRACT)

    # Chanfrein1
    chanfrein1_edges = [part.edges().sort_by_distance(p)[0] for p in [
        (125, 8.5, 99.5),
        (125, 14.5, 99.5),
    ]]
    chamfer(chanfrein1_edges, length=CHANFREIN1_SIZE)

    # Répétition linéaire1: Balayage1, Enlèv. mat.-Extru.6 ×2
    with Locations(*[(0, i * R_P_TITION_LIN_AIRE1_PITCH, 0) for i in range(1, R_P_TITION_LIN_AIRE1_COUNT)]):
        add(balayage1)
        add(enl_v_mat_extru_6, mode=Mode.SUBTRACT)

    # Chanfrein1 of Répétition linéaire1
    chanfrein1_of_r_p_tition_lin_aire1_edges = [part.edges().sort_by_distance(p)[0] for p in [
        (125, 50, 99.5),
        (125, 56, 99.5),
    ]]
    chamfer(chanfrein1_of_r_p_tition_lin_aire1_edges, length=CHANFREIN1_OF_R_P_TITION_LIN_AIRE1_SIZE)


solid = part.part
